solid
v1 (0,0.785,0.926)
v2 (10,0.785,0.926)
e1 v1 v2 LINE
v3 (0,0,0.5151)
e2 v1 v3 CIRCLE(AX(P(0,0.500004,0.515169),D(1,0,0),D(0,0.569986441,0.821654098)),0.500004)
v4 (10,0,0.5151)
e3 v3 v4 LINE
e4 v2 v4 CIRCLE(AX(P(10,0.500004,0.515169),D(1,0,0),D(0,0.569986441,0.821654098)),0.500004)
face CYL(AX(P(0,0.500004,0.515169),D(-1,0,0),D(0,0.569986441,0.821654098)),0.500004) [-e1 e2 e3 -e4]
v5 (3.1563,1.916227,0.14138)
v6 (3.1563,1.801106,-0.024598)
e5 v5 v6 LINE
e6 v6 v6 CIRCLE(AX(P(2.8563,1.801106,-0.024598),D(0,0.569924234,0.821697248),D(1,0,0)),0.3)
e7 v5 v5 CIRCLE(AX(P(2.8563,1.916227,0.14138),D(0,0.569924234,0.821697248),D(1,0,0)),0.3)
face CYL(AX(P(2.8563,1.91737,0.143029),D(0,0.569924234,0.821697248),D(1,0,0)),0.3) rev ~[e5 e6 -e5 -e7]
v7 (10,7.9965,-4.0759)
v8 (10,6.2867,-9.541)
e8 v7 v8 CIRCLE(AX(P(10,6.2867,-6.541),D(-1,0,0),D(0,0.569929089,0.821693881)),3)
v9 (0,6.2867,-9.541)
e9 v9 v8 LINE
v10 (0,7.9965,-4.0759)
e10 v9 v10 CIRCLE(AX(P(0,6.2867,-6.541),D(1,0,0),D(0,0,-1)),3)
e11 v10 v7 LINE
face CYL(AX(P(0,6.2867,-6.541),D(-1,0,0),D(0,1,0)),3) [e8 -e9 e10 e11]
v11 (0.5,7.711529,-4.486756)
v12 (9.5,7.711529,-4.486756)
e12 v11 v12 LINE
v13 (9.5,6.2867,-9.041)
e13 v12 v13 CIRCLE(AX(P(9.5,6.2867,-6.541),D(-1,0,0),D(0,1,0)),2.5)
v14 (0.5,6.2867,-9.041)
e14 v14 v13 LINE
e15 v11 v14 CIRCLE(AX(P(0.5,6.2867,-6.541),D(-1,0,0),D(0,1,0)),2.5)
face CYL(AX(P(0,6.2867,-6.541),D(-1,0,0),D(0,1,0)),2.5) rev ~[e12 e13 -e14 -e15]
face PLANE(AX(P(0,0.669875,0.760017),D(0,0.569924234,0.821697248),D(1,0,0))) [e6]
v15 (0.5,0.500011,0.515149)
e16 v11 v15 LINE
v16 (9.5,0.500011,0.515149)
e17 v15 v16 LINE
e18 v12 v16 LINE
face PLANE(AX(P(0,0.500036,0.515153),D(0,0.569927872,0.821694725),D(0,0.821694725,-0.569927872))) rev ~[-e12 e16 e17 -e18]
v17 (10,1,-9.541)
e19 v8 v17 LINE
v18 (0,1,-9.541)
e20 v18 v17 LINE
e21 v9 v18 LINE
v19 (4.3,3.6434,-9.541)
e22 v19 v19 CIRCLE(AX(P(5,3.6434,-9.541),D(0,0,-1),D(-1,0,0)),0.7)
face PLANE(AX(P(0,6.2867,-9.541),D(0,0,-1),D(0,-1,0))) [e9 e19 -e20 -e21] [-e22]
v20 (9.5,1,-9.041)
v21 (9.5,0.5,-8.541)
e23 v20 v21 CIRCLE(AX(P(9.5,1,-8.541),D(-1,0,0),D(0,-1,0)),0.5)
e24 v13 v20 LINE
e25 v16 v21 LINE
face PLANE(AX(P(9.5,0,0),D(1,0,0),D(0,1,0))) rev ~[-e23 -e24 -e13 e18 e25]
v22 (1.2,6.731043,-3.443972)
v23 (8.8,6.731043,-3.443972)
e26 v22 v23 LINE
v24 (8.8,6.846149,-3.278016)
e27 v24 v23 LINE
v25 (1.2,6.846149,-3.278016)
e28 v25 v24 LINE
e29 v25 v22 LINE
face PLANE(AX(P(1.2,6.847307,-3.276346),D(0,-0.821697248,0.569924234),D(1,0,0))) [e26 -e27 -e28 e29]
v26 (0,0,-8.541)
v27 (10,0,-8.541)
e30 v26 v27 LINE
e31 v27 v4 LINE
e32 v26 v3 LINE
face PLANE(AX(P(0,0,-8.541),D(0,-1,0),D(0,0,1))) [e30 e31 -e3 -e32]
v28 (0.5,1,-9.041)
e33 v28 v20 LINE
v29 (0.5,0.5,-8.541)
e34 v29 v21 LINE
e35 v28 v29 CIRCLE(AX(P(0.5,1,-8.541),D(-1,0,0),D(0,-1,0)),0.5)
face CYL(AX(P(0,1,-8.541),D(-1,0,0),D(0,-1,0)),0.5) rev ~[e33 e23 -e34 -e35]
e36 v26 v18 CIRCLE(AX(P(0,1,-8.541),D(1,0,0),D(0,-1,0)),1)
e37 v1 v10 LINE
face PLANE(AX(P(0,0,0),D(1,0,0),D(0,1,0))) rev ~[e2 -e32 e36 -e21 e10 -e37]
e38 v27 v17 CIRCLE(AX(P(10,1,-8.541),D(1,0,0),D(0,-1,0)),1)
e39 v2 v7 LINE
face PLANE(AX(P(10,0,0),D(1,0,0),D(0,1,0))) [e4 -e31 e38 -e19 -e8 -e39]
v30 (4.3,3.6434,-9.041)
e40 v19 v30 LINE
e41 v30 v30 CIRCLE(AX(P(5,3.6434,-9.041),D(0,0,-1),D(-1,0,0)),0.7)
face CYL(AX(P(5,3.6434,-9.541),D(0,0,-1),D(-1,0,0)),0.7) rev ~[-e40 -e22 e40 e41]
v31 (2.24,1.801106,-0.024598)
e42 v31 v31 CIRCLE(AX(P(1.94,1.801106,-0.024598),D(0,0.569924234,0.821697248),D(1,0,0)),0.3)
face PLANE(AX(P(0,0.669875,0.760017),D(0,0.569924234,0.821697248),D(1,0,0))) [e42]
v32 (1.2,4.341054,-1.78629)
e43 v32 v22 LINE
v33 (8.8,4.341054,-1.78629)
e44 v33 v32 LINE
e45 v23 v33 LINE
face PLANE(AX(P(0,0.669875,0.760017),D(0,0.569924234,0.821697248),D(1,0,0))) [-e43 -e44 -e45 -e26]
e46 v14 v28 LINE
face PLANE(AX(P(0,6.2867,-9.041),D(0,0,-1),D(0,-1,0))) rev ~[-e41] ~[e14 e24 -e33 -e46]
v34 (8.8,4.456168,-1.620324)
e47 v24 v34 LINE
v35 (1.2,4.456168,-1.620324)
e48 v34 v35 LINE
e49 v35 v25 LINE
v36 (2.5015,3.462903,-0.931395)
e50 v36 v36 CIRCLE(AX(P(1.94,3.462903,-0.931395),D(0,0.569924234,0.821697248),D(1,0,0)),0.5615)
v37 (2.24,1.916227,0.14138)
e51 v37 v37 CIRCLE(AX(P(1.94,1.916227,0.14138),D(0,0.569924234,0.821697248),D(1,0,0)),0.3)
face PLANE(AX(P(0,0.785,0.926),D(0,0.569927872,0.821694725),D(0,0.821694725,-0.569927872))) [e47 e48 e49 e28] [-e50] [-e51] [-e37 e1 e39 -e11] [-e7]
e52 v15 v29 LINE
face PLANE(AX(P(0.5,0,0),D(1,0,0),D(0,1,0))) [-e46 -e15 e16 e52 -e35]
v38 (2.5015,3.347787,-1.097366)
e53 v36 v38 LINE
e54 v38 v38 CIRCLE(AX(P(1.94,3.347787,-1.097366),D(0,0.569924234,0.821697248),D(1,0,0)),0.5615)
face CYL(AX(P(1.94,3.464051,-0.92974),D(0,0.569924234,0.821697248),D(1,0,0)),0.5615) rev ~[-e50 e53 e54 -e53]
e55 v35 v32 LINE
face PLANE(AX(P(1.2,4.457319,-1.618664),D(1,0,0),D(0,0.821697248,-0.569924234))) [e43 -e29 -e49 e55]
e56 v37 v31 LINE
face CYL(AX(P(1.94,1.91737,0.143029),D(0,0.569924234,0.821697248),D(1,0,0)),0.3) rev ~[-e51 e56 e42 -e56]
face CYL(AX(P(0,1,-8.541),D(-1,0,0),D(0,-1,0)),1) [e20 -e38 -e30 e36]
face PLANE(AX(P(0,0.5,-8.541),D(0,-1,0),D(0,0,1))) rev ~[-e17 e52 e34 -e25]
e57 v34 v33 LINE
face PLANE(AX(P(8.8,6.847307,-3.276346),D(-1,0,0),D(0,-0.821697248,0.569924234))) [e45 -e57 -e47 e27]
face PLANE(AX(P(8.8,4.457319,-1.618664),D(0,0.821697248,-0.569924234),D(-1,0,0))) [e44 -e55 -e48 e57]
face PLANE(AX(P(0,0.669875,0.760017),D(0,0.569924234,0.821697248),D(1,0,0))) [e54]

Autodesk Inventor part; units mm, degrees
ref_plane "YZ Plane" through (0, 0, 0) normal (1, 0, 0) x (0, 1, 0)
ref_plane "XZ Plane" through (0, 0, 0) normal (0, 1, 0) x (-1, 0, 0)
ref_plane "XY Plane" through (0, 0, 0) normal (0, 0, 1) x (1, 0, 0)
sketch "Sketch1" plane through (0, 0, 0) normal (1, 0, 0) x (0, 1, 0)
  circle A0 centre (6.2867, -6.541) radius 3
  line L0 (6.2867, -9.541) -> (1, -9.541)
  line L1 (0, -8.541) -> (0, 0.5151)
  line L2 (0.785, 0.926) -> (7.9965, -4.0759)
  arc A1 (0.785, 0.926) -> (0, 0.5151) centre (0.5, 0.5151) ccw
  arc A2 (0, -8.541) -> (1, -9.541) centre (1, -8.541) ccw
  point P0 (0, 0)
  dimension "d0" = 6
  dimension "d1" = 0.5
  dimension "d2" = 1
extrude "Extrusion1" add sketch "Sketch1" along normal blind 10
shell "Shell1" thickness 0.5 removed faces 0
sketch "Sketch2" plane through (0, 0.785, 0.926) normal (0, 0.5699242, 0.8216972) x (1, 0, 0)
  line L0 (0, 8.7764) -> (0, 0) projected
  line L1 (0, 0) -> (10, 0) projected
  line L2 (10, 8.7764) -> (10, 0) projected
  line L3 (0, 8.7764) -> (10, 8.7764) projected
  line L4 (1.2, 7.3764) -> (8.8, 7.3764)
  line L5 (8.8, 7.3764) -> (8.8, 4.4678)
  line L6 (8.8, 4.4678) -> (1.2, 4.4678)
  line L7 (1.2, 4.4678) -> (1.2, 7.3764)
  circle A0 centre (1.94, 3.259) radius 0.5615
  circle A1 centre (1.94, 1.3767) radius 0.3
  circle A2 centre (2.8563, 1.3767) radius 0.3
  point P0 (0, -0.1173)
  dimension "d6" = 1.4
  dimension "d7" = 1.2
  dimension "d8" = 1.2
  dimension "d9" = 0.6
  dimension "d10" = 0.6
extrude "Extrusion2" cut sketch "Sketch2" against normal blind 0.2 contours L4 L5 L6 L7 | A0 | A1 | A2
sketch "Sketch3" plane through (0, 1, -9.541) normal (0, 0, -1) x (-1, 0, 0)
  circle A0 centre (-5, 2.6434) radius 0.7
  line L0 (0, 0) -> (0, 5.2867) projected
  line L1 (0, 5.2867) -> (-10, 5.2867) projected
  line L2 (-10, 0) -> (-10, 5.2867) projected
  line L3 (0, 0) -> (-10, 0) projected
  point P0 (0, -1)
  dimension "d13" = 1.4
extrude "Extrusion3" cut sketch "Sketch3" against normal blind 1 contours A0
properties part number "caja del arduino"
